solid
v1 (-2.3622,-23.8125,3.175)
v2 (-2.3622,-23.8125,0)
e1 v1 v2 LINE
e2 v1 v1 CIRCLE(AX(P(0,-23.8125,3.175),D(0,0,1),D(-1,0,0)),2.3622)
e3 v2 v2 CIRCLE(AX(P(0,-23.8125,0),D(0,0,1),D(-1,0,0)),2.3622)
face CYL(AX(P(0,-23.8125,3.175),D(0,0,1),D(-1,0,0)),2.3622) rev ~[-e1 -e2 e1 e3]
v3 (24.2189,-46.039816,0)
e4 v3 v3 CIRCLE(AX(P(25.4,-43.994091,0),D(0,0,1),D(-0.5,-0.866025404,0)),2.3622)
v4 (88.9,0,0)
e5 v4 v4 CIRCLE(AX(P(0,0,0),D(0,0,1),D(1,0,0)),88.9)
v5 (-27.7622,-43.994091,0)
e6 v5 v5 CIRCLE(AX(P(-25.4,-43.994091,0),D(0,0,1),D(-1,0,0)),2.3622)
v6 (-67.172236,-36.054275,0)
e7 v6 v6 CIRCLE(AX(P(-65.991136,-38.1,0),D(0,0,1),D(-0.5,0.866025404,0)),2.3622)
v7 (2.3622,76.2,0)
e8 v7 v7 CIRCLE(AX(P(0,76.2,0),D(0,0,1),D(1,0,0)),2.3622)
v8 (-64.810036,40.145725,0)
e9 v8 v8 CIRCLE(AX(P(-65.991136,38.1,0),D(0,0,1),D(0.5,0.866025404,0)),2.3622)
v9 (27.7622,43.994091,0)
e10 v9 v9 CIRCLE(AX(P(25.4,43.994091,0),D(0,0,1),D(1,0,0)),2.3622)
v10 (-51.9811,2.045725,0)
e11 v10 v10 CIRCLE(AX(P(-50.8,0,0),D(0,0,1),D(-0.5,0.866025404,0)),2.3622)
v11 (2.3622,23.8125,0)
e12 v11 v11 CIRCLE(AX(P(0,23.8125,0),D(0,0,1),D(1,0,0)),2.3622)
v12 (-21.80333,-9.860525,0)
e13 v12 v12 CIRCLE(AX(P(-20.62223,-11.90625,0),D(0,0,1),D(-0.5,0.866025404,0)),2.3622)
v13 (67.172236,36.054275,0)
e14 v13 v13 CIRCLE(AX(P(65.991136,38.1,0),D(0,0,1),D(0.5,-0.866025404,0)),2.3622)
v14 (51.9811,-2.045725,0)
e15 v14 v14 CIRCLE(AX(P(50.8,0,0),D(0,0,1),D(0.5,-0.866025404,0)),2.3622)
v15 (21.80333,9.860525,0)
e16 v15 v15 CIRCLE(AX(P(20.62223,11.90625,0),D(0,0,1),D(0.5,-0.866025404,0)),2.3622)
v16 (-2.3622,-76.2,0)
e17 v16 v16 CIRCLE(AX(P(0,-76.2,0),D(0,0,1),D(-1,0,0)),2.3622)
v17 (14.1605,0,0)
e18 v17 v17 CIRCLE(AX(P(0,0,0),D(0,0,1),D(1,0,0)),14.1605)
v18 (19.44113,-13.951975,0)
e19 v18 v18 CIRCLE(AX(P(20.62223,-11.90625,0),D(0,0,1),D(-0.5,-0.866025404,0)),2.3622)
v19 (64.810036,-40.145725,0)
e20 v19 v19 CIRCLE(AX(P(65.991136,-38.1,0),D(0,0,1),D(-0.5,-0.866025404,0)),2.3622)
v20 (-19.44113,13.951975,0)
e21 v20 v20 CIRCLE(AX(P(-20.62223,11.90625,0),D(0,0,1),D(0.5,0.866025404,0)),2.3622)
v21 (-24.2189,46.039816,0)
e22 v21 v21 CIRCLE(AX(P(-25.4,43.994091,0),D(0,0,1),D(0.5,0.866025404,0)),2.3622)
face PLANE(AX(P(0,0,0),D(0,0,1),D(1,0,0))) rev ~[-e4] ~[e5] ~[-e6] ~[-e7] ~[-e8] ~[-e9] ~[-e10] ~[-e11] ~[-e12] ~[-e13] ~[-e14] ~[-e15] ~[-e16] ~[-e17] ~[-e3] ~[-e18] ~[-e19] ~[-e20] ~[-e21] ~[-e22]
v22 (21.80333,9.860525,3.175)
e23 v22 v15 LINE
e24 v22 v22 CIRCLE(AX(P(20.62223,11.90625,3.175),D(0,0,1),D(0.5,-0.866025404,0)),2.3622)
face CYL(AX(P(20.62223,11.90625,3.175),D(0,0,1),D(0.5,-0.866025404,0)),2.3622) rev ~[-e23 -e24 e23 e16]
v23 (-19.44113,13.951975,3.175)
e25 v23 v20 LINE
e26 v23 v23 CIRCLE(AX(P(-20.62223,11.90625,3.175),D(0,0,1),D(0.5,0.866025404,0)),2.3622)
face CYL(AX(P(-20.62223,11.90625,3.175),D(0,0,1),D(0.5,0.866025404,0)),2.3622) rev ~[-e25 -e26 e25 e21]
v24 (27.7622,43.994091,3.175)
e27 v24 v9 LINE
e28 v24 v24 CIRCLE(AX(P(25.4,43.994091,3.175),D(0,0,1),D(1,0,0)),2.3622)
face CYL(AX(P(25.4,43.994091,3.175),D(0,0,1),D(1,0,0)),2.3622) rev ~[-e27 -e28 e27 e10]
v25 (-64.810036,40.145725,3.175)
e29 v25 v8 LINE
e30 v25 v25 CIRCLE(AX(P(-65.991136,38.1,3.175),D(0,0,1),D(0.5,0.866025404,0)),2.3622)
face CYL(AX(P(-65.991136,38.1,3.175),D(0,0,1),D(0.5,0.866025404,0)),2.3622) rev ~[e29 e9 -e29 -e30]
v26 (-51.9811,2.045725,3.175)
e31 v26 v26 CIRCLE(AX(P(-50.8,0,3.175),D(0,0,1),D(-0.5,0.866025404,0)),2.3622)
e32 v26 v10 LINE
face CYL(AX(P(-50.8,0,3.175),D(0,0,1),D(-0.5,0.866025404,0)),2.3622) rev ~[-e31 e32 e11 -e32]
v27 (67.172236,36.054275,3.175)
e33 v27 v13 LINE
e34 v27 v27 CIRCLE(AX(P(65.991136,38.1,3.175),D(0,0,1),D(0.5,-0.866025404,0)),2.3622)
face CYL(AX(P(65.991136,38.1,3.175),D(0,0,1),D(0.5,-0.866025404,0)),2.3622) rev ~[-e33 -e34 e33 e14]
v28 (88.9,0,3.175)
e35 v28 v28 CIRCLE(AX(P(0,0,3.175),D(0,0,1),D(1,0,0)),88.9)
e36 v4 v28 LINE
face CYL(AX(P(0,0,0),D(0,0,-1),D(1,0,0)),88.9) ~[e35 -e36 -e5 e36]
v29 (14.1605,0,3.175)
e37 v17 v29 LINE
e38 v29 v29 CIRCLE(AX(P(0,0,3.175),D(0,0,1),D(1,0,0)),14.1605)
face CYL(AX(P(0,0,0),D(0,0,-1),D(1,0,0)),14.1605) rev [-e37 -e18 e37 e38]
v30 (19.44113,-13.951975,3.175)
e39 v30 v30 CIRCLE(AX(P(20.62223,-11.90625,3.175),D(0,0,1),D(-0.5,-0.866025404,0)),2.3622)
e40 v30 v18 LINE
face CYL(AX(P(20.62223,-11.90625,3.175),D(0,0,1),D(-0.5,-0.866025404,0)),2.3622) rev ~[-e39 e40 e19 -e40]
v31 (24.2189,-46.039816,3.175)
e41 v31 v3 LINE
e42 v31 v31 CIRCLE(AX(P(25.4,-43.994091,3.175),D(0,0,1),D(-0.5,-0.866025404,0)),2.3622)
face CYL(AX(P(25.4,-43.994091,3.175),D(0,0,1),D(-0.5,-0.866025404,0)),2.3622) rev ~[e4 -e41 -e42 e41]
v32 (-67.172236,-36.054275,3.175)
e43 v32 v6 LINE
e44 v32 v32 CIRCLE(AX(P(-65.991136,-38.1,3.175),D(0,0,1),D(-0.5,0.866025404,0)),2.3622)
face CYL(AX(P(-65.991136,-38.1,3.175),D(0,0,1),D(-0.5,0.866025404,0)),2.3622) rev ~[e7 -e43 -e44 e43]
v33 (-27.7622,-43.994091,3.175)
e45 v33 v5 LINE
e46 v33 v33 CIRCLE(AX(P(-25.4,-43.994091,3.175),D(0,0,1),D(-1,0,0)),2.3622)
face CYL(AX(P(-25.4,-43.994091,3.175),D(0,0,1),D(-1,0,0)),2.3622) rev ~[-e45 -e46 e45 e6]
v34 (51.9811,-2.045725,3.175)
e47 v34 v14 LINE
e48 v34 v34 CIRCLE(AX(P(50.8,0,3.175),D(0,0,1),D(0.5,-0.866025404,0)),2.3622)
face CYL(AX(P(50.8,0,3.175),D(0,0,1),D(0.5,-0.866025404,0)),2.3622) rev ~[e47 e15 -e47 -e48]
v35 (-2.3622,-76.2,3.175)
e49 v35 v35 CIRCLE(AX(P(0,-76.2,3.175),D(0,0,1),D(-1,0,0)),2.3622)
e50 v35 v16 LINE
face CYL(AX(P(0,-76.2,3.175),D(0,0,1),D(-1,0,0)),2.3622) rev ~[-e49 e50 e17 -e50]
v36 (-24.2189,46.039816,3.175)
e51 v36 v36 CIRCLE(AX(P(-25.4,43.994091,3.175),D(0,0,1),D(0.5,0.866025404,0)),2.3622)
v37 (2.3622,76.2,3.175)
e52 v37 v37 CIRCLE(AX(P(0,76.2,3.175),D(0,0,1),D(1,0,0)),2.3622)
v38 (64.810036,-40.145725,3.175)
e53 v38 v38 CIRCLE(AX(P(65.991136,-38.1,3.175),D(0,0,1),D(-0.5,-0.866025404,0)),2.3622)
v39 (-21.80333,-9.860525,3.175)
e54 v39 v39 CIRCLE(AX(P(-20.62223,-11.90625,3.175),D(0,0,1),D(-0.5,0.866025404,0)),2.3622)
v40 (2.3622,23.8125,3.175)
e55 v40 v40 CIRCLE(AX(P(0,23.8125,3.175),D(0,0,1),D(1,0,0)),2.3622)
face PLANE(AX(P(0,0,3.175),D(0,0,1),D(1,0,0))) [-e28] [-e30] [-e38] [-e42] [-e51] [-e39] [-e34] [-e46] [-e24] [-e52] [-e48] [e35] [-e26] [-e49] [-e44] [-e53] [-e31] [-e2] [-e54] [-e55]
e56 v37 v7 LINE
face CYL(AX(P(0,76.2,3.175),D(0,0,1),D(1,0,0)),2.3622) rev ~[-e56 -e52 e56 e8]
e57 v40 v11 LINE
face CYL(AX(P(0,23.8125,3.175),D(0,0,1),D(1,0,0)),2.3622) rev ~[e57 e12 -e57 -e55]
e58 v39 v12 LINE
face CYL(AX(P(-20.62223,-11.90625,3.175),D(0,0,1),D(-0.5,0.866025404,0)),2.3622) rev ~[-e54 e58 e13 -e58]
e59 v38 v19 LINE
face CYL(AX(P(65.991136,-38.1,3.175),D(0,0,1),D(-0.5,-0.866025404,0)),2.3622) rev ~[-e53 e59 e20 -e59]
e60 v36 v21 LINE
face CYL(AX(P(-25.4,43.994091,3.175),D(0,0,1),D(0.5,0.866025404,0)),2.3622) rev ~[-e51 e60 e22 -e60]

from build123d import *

# Parameters (mm, degrees)
F0_R            = 88.9
F0_R_2          = 14.1605
F1_DEPTH        = 3.175
F2_R            = 2.3622
F3_DEPTH        = 3.176
F3_COPIES_COUNT = 6


# Not quite as in the source:
# - a pattern or mirror of a feature is missing from the dataset's text; its kind, count and spacing are read off the source's solid


with BuildPart() as f1:
    # F0 (on Top) → F1 (new body)
    with BuildSketch(Plane.XY):
        Circle(F0_R)
        Circle(F0_R_2, mode=Mode.SUBTRACT)
    extrude(amount=F1_DEPTH)

    # F2 (on face) → F3 (cut, through all)
    with BuildSketch(Plane.XY.offset(3.175)):
        with Locations((0, 23.8125)):
            Circle(F2_R)
        with Locations((0, 76.2)):
            Circle(F2_R)
        with Locations((25.4, 43.9940905122)):
            Circle(F2_R)
    f3 = extrude(amount=-F3_DEPTH, mode=Mode.SUBTRACT)

    # F3_copies: F3 ×6 about axis
    f3_copies_axis = Axis((0, 0, 0), (0, 0, 1))
    for i in range(1, F3_COPIES_COUNT):
        add(f3.rotate(f3_copies_axis, i * 360 / F3_COPIES_COUNT), mode=Mode.SUBTRACT)


solid = f1.part
